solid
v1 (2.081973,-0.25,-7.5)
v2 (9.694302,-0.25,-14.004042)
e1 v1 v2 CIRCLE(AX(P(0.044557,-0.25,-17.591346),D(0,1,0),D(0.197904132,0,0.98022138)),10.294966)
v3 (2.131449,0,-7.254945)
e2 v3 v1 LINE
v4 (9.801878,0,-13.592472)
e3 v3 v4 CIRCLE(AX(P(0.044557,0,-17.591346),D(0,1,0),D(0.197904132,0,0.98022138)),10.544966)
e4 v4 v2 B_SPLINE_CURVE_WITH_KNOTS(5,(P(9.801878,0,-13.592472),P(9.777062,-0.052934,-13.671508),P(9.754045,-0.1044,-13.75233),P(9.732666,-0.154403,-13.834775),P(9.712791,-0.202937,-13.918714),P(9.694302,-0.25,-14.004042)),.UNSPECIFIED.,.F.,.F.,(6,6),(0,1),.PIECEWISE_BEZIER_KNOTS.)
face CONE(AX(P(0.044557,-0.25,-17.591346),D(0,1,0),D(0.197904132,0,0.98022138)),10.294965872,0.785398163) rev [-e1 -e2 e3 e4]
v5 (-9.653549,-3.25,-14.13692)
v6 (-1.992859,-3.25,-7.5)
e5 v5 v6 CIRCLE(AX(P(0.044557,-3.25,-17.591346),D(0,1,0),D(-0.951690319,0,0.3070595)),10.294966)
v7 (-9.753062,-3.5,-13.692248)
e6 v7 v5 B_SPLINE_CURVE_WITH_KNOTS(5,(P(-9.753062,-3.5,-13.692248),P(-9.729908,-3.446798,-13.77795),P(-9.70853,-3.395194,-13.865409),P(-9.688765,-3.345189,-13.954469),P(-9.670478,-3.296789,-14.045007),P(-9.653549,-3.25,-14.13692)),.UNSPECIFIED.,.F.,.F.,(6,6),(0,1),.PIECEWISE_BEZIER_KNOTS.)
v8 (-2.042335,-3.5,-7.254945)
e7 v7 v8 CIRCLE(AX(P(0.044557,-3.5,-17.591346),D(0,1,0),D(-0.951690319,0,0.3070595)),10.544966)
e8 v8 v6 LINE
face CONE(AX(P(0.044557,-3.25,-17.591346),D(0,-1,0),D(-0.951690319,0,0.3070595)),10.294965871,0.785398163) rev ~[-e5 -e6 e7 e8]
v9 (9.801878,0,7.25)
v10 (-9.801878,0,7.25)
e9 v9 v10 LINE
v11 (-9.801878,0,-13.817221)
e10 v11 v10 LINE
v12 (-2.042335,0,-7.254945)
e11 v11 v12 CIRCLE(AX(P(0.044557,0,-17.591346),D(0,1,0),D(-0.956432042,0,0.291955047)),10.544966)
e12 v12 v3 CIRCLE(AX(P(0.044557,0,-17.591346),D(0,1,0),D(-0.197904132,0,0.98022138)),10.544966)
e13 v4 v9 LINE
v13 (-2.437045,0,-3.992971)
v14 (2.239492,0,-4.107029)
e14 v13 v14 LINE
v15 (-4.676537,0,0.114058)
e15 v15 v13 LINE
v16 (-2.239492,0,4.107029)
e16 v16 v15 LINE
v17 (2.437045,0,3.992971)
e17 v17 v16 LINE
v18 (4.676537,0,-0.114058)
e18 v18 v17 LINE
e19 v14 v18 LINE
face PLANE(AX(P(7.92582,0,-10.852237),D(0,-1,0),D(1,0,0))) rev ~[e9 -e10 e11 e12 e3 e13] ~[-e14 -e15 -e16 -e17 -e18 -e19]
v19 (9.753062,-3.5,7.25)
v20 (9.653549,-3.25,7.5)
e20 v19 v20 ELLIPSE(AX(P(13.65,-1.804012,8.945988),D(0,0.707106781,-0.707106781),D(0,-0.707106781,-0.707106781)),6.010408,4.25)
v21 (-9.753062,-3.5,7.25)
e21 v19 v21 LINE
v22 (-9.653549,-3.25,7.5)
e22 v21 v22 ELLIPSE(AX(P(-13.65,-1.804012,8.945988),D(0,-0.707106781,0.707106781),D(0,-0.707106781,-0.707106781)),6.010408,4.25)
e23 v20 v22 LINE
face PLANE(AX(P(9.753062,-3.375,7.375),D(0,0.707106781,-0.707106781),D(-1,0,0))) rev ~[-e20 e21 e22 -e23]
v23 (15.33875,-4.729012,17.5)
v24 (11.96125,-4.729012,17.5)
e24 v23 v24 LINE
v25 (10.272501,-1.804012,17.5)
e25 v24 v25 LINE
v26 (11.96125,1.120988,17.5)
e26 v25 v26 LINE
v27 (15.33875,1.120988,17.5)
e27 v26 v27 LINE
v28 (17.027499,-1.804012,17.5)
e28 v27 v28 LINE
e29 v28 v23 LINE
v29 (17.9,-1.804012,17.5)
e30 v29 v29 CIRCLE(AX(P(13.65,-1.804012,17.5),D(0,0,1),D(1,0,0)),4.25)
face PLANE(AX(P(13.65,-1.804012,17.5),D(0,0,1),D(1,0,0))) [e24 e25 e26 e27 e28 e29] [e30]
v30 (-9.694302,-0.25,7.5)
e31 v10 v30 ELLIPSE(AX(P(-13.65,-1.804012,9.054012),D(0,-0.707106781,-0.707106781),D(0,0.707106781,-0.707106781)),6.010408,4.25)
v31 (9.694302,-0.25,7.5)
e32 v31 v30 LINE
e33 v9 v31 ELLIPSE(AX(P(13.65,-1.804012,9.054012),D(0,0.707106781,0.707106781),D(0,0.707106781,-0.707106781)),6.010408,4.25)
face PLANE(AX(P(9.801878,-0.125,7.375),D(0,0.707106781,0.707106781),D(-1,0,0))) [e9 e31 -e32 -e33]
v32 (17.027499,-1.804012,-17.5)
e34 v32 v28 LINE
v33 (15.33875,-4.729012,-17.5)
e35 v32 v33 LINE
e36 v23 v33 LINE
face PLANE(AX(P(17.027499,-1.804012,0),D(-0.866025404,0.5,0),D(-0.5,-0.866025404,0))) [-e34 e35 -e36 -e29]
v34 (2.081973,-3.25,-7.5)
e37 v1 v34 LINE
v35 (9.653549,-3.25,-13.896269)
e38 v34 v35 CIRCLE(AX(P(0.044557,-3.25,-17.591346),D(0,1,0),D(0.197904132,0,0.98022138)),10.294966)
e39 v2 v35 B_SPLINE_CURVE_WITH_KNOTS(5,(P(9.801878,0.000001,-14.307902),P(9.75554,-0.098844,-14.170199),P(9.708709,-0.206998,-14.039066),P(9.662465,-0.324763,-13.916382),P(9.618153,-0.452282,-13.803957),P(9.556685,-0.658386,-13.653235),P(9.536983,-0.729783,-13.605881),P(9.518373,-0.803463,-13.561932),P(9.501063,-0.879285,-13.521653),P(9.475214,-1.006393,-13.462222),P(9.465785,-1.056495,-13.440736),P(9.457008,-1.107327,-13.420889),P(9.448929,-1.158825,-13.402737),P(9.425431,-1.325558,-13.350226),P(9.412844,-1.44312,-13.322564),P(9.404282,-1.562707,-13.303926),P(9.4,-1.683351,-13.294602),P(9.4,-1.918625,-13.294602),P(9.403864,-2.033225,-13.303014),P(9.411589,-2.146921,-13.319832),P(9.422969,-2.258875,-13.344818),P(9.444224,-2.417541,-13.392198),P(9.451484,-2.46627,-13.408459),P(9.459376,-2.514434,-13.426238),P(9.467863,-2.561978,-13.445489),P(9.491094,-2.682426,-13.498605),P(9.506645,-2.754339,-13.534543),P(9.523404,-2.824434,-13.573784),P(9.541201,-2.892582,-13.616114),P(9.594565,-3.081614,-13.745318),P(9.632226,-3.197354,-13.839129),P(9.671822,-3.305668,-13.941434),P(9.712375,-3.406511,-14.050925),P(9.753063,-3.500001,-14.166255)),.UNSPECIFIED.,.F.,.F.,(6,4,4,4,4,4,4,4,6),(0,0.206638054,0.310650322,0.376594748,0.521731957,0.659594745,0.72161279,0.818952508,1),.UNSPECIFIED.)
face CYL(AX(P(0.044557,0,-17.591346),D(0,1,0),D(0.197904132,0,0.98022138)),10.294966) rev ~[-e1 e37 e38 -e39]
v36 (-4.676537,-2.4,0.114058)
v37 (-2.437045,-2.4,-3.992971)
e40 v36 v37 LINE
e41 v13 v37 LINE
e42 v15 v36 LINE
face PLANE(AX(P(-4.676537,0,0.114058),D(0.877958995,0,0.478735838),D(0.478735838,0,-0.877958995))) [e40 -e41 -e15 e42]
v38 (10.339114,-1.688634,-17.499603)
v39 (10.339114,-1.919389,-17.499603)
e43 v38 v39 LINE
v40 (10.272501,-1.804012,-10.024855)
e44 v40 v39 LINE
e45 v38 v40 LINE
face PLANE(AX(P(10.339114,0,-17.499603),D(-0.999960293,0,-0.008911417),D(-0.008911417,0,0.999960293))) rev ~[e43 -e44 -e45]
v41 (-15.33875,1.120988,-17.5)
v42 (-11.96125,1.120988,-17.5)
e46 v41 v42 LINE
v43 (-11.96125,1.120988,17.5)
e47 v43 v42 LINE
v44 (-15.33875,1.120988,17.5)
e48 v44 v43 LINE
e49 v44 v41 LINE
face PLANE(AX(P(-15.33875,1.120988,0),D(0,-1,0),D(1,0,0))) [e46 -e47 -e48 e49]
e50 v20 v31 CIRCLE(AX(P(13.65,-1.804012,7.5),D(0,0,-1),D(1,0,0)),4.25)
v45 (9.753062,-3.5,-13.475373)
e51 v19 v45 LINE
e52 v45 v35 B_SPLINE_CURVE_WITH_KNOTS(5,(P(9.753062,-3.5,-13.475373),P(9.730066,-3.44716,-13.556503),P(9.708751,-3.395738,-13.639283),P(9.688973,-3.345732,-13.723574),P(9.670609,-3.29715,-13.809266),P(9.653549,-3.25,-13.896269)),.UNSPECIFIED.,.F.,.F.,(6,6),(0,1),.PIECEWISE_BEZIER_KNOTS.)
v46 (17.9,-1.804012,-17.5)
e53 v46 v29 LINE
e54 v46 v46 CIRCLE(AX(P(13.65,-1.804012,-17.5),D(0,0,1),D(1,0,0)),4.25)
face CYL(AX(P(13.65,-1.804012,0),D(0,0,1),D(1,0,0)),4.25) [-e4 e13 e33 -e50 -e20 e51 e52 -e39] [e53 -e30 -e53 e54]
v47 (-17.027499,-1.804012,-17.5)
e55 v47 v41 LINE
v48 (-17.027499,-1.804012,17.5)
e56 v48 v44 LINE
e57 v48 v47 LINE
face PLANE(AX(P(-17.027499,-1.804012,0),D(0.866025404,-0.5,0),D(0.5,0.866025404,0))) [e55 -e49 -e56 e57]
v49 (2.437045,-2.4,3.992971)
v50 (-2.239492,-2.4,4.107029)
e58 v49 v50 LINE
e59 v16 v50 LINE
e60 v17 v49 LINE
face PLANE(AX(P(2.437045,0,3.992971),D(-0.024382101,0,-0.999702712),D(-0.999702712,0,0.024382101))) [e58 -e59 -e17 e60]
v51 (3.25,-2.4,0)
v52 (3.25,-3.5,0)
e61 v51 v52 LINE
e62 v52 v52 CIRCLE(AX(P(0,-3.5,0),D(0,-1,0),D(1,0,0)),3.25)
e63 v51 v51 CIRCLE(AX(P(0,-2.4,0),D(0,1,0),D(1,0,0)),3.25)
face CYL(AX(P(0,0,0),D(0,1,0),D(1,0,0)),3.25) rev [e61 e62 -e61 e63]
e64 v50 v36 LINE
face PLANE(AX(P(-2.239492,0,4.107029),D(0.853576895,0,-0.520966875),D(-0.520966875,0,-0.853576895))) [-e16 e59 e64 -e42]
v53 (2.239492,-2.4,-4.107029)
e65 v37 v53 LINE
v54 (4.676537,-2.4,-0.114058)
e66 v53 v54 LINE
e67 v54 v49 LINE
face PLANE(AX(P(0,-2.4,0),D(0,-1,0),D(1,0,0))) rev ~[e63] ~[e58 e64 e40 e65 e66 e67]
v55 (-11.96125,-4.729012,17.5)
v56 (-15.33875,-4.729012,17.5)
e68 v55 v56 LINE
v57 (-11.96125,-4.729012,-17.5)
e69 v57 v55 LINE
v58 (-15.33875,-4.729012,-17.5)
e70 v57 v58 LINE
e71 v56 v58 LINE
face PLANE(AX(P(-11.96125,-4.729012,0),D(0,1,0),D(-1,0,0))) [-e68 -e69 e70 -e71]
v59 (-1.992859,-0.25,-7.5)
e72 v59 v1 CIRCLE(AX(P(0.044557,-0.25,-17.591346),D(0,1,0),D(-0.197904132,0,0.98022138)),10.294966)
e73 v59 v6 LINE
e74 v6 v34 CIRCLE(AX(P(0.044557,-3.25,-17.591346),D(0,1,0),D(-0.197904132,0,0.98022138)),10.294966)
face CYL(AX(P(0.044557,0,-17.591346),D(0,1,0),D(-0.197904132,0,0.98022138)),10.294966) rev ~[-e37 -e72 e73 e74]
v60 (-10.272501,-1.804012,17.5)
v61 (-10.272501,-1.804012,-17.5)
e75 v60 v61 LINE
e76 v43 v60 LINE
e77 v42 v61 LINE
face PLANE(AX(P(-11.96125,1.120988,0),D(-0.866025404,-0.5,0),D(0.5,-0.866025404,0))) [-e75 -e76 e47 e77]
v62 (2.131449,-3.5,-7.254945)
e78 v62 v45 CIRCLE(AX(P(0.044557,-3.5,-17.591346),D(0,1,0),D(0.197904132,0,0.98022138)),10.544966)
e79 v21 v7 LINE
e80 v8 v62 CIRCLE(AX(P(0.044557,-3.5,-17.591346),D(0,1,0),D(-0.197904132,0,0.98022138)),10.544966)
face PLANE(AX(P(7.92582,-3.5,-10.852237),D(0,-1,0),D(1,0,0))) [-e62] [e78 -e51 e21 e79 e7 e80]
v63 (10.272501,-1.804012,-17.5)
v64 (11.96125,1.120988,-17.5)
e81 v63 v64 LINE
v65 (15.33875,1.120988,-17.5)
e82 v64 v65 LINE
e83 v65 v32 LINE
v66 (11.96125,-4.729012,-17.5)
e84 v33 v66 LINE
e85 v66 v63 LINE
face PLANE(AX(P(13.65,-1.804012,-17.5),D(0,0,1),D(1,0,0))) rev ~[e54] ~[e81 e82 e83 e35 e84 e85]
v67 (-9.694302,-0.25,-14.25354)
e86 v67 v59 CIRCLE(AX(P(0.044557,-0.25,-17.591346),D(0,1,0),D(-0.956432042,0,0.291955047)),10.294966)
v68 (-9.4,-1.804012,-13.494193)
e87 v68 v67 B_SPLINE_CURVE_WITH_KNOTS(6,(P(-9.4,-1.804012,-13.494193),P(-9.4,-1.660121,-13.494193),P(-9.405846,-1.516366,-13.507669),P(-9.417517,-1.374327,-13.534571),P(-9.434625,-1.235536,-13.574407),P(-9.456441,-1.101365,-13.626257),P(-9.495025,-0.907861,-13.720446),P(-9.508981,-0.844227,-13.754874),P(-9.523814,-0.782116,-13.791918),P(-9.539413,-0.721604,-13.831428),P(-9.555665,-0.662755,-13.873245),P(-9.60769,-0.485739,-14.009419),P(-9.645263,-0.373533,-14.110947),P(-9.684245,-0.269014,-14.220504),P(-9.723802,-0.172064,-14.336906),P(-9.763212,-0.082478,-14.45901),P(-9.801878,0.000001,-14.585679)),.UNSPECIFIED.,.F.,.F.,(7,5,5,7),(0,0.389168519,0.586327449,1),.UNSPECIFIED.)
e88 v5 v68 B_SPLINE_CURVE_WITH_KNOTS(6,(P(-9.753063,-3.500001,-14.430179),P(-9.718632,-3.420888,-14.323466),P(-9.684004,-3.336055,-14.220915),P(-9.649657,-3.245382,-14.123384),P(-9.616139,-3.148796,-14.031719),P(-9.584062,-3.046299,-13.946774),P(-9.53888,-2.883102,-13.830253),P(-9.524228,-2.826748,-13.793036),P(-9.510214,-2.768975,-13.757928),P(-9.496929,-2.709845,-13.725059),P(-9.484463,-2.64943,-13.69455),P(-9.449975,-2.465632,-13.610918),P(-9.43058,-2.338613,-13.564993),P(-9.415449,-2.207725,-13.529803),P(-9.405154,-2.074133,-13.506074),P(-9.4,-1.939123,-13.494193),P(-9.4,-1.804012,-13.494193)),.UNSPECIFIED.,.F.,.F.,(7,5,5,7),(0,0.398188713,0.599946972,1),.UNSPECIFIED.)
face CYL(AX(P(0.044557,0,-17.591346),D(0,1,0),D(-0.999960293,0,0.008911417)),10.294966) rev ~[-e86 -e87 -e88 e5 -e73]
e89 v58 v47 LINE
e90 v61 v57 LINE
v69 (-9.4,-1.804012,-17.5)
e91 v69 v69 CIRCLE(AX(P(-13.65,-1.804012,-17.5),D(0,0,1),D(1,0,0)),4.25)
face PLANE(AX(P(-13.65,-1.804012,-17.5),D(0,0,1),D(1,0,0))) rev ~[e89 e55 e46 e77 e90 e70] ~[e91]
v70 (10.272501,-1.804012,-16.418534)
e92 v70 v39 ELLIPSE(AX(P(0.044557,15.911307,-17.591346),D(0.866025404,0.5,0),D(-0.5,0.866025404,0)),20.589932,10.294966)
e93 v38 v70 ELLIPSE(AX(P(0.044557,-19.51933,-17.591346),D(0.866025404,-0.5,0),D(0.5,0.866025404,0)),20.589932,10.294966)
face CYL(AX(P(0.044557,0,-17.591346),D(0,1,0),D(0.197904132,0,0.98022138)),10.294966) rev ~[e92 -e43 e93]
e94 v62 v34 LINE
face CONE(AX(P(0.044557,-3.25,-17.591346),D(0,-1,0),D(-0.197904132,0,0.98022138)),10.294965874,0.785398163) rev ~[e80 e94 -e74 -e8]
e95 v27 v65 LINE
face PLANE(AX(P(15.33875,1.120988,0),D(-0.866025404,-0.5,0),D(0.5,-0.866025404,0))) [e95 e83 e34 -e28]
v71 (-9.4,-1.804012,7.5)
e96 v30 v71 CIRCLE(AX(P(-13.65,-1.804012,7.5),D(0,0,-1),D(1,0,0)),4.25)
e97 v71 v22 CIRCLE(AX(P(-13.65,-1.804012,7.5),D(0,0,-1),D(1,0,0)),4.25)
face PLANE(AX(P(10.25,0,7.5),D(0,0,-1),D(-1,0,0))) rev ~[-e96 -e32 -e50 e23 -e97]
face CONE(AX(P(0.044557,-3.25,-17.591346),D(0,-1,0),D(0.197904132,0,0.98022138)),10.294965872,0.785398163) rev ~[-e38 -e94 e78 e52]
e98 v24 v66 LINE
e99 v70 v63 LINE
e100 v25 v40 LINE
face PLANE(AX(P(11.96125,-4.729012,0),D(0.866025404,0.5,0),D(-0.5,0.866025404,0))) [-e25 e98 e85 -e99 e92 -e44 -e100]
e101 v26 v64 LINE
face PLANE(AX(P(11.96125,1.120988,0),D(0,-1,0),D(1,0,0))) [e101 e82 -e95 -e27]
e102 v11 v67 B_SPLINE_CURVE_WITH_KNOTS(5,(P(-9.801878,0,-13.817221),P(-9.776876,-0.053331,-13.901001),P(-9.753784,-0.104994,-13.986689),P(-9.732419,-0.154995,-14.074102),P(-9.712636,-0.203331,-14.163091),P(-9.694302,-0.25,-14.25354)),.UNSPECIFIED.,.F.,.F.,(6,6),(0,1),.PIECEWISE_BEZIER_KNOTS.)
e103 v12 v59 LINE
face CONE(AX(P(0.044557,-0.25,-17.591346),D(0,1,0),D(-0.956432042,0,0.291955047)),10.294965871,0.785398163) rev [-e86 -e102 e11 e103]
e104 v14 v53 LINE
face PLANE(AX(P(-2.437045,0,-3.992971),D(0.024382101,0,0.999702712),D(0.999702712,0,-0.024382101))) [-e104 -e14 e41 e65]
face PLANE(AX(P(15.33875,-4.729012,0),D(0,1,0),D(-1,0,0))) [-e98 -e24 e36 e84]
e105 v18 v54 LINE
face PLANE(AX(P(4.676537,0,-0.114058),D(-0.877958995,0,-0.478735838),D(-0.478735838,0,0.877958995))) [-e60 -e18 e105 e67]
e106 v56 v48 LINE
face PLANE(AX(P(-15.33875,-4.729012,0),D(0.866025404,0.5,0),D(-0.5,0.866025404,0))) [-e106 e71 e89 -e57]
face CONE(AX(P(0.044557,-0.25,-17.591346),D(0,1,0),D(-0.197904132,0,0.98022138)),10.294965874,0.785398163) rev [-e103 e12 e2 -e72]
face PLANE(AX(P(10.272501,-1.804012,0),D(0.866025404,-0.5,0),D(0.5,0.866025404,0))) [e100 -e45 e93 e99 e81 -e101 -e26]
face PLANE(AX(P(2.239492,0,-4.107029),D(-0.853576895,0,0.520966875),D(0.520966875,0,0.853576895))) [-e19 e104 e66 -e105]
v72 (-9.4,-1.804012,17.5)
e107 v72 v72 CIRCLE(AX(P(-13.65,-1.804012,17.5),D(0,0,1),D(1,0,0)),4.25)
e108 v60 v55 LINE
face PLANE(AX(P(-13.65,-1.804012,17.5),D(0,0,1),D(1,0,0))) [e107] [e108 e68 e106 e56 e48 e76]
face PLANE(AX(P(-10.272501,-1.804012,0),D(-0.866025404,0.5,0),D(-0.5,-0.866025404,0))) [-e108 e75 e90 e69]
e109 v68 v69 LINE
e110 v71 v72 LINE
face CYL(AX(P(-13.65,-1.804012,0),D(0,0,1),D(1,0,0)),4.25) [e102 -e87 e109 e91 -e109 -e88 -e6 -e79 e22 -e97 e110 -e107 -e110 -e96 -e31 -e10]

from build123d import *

# Parameters (mm, degrees)
F0_R          = 3.25
F1_DEPTH      = 3.5
F3_DEPTH      = 2.4
F4_R          = 4.25
F5_DEPTH      = 17.5
F5_DEPTH_BACK = 17.5
F6_SIZE       = 0.25


with BuildPart() as f1:
    # F0 (on Front) → F1 (new body)
    with BuildSketch(Plane.XZ):
        with BuildLine():
            Line((10.3391141687, -17.4996029254), (10.25, -7.5))
            Line((10.25, -7.5), (2.081973366, -7.5))
            ThreePointArc((2.081973366, -7.5), (7.9829074445, -11.0362777063), (10.3391141687, -17.4996029254))
        make_face()
        with BuildLine():
            Line((2.081973366, -7.5), (10.25, -7.5))
            Line((10.25, -7.5), (10.25, 7.5))
            Line((10.25, 7.5), (-10.25, 7.5))
            Line((-10.25, 7.5), (-10.25, -7.5))
            Line((-10.25, -7.5), (-1.9928591974, -7.5))
            ThreePointArc((-1.9928591974, -7.5), (0.0445570843, -7.2963797866), (2.081973366, -7.5))
        make_face()
        Circle(F0_R, mode=Mode.SUBTRACT)
        with BuildLine():
            ThreePointArc((-10.25, -17.4996029254), (-7.8937932759, -11.0362777063), (-1.9928591974, -7.5))
            Line((-1.9928591974, -7.5), (-10.25, -7.5))
            Line((-10.25, -7.5), (-10.25, -17.4996029254))
        make_face()
    extrude(amount=F1_DEPTH)

    # F2 (on Front) → F3 (cut)
    with BuildSketch(Plane.XZ):
        Polygon((-2.4370454627, -3.9929711461), (2.2394917178, -4.1070288539), (4.6765371804, -0.1140577078), (2.4370454627, 3.9929711461), (-2.2394917178, 4.1070288539), (-4.6765371804, 0.1140577078), align=None)
    extrude(amount=F3_DEPTH, mode=Mode.SUBTRACT)

    # F4 (on Top) → F5 (join, two sides)
    with BuildSketch(Plane.XY) as f5_sk:
        with Locations((13.65, -1.804011694)):
            Circle(F4_R)
        Polygon((17.0274990748, -1.804011694), (15.3387495374, -4.729011694), (11.9612504626, -4.729011694), (10.2725009252, -1.804011694), (11.9612504626, 1.120988306), (15.3387495374, 1.120988306), align=None, mode=Mode.SUBTRACT)
        with Locations((-13.65, -1.804011694)):
            Circle(F4_R)
        Polygon((-11.9612504626, -4.729011694), (-15.3387495374, -4.729011694), (-17.0274990748, -1.804011694), (-15.3387495374, 1.120988306), (-11.9612504626, 1.120988306), (-10.2725009252, -1.804011694), align=None, mode=Mode.SUBTRACT)
    extrude(amount=F5_DEPTH)
    extrude(f5_sk.sketch, amount=-F5_DEPTH_BACK)

    # F6
    f6_edges = [f1.edges().sort_by_distance(p)[0] for p in [
        (0, -3.5, 7.5),
        (0, 0, 7.5),
        (-0.094724, -3.5, -7.297322),
        (-0.101304, 0, -7.297413),
    ]]
    chamfer(f6_edges, length=F6_SIZE)


solid = f1.part
